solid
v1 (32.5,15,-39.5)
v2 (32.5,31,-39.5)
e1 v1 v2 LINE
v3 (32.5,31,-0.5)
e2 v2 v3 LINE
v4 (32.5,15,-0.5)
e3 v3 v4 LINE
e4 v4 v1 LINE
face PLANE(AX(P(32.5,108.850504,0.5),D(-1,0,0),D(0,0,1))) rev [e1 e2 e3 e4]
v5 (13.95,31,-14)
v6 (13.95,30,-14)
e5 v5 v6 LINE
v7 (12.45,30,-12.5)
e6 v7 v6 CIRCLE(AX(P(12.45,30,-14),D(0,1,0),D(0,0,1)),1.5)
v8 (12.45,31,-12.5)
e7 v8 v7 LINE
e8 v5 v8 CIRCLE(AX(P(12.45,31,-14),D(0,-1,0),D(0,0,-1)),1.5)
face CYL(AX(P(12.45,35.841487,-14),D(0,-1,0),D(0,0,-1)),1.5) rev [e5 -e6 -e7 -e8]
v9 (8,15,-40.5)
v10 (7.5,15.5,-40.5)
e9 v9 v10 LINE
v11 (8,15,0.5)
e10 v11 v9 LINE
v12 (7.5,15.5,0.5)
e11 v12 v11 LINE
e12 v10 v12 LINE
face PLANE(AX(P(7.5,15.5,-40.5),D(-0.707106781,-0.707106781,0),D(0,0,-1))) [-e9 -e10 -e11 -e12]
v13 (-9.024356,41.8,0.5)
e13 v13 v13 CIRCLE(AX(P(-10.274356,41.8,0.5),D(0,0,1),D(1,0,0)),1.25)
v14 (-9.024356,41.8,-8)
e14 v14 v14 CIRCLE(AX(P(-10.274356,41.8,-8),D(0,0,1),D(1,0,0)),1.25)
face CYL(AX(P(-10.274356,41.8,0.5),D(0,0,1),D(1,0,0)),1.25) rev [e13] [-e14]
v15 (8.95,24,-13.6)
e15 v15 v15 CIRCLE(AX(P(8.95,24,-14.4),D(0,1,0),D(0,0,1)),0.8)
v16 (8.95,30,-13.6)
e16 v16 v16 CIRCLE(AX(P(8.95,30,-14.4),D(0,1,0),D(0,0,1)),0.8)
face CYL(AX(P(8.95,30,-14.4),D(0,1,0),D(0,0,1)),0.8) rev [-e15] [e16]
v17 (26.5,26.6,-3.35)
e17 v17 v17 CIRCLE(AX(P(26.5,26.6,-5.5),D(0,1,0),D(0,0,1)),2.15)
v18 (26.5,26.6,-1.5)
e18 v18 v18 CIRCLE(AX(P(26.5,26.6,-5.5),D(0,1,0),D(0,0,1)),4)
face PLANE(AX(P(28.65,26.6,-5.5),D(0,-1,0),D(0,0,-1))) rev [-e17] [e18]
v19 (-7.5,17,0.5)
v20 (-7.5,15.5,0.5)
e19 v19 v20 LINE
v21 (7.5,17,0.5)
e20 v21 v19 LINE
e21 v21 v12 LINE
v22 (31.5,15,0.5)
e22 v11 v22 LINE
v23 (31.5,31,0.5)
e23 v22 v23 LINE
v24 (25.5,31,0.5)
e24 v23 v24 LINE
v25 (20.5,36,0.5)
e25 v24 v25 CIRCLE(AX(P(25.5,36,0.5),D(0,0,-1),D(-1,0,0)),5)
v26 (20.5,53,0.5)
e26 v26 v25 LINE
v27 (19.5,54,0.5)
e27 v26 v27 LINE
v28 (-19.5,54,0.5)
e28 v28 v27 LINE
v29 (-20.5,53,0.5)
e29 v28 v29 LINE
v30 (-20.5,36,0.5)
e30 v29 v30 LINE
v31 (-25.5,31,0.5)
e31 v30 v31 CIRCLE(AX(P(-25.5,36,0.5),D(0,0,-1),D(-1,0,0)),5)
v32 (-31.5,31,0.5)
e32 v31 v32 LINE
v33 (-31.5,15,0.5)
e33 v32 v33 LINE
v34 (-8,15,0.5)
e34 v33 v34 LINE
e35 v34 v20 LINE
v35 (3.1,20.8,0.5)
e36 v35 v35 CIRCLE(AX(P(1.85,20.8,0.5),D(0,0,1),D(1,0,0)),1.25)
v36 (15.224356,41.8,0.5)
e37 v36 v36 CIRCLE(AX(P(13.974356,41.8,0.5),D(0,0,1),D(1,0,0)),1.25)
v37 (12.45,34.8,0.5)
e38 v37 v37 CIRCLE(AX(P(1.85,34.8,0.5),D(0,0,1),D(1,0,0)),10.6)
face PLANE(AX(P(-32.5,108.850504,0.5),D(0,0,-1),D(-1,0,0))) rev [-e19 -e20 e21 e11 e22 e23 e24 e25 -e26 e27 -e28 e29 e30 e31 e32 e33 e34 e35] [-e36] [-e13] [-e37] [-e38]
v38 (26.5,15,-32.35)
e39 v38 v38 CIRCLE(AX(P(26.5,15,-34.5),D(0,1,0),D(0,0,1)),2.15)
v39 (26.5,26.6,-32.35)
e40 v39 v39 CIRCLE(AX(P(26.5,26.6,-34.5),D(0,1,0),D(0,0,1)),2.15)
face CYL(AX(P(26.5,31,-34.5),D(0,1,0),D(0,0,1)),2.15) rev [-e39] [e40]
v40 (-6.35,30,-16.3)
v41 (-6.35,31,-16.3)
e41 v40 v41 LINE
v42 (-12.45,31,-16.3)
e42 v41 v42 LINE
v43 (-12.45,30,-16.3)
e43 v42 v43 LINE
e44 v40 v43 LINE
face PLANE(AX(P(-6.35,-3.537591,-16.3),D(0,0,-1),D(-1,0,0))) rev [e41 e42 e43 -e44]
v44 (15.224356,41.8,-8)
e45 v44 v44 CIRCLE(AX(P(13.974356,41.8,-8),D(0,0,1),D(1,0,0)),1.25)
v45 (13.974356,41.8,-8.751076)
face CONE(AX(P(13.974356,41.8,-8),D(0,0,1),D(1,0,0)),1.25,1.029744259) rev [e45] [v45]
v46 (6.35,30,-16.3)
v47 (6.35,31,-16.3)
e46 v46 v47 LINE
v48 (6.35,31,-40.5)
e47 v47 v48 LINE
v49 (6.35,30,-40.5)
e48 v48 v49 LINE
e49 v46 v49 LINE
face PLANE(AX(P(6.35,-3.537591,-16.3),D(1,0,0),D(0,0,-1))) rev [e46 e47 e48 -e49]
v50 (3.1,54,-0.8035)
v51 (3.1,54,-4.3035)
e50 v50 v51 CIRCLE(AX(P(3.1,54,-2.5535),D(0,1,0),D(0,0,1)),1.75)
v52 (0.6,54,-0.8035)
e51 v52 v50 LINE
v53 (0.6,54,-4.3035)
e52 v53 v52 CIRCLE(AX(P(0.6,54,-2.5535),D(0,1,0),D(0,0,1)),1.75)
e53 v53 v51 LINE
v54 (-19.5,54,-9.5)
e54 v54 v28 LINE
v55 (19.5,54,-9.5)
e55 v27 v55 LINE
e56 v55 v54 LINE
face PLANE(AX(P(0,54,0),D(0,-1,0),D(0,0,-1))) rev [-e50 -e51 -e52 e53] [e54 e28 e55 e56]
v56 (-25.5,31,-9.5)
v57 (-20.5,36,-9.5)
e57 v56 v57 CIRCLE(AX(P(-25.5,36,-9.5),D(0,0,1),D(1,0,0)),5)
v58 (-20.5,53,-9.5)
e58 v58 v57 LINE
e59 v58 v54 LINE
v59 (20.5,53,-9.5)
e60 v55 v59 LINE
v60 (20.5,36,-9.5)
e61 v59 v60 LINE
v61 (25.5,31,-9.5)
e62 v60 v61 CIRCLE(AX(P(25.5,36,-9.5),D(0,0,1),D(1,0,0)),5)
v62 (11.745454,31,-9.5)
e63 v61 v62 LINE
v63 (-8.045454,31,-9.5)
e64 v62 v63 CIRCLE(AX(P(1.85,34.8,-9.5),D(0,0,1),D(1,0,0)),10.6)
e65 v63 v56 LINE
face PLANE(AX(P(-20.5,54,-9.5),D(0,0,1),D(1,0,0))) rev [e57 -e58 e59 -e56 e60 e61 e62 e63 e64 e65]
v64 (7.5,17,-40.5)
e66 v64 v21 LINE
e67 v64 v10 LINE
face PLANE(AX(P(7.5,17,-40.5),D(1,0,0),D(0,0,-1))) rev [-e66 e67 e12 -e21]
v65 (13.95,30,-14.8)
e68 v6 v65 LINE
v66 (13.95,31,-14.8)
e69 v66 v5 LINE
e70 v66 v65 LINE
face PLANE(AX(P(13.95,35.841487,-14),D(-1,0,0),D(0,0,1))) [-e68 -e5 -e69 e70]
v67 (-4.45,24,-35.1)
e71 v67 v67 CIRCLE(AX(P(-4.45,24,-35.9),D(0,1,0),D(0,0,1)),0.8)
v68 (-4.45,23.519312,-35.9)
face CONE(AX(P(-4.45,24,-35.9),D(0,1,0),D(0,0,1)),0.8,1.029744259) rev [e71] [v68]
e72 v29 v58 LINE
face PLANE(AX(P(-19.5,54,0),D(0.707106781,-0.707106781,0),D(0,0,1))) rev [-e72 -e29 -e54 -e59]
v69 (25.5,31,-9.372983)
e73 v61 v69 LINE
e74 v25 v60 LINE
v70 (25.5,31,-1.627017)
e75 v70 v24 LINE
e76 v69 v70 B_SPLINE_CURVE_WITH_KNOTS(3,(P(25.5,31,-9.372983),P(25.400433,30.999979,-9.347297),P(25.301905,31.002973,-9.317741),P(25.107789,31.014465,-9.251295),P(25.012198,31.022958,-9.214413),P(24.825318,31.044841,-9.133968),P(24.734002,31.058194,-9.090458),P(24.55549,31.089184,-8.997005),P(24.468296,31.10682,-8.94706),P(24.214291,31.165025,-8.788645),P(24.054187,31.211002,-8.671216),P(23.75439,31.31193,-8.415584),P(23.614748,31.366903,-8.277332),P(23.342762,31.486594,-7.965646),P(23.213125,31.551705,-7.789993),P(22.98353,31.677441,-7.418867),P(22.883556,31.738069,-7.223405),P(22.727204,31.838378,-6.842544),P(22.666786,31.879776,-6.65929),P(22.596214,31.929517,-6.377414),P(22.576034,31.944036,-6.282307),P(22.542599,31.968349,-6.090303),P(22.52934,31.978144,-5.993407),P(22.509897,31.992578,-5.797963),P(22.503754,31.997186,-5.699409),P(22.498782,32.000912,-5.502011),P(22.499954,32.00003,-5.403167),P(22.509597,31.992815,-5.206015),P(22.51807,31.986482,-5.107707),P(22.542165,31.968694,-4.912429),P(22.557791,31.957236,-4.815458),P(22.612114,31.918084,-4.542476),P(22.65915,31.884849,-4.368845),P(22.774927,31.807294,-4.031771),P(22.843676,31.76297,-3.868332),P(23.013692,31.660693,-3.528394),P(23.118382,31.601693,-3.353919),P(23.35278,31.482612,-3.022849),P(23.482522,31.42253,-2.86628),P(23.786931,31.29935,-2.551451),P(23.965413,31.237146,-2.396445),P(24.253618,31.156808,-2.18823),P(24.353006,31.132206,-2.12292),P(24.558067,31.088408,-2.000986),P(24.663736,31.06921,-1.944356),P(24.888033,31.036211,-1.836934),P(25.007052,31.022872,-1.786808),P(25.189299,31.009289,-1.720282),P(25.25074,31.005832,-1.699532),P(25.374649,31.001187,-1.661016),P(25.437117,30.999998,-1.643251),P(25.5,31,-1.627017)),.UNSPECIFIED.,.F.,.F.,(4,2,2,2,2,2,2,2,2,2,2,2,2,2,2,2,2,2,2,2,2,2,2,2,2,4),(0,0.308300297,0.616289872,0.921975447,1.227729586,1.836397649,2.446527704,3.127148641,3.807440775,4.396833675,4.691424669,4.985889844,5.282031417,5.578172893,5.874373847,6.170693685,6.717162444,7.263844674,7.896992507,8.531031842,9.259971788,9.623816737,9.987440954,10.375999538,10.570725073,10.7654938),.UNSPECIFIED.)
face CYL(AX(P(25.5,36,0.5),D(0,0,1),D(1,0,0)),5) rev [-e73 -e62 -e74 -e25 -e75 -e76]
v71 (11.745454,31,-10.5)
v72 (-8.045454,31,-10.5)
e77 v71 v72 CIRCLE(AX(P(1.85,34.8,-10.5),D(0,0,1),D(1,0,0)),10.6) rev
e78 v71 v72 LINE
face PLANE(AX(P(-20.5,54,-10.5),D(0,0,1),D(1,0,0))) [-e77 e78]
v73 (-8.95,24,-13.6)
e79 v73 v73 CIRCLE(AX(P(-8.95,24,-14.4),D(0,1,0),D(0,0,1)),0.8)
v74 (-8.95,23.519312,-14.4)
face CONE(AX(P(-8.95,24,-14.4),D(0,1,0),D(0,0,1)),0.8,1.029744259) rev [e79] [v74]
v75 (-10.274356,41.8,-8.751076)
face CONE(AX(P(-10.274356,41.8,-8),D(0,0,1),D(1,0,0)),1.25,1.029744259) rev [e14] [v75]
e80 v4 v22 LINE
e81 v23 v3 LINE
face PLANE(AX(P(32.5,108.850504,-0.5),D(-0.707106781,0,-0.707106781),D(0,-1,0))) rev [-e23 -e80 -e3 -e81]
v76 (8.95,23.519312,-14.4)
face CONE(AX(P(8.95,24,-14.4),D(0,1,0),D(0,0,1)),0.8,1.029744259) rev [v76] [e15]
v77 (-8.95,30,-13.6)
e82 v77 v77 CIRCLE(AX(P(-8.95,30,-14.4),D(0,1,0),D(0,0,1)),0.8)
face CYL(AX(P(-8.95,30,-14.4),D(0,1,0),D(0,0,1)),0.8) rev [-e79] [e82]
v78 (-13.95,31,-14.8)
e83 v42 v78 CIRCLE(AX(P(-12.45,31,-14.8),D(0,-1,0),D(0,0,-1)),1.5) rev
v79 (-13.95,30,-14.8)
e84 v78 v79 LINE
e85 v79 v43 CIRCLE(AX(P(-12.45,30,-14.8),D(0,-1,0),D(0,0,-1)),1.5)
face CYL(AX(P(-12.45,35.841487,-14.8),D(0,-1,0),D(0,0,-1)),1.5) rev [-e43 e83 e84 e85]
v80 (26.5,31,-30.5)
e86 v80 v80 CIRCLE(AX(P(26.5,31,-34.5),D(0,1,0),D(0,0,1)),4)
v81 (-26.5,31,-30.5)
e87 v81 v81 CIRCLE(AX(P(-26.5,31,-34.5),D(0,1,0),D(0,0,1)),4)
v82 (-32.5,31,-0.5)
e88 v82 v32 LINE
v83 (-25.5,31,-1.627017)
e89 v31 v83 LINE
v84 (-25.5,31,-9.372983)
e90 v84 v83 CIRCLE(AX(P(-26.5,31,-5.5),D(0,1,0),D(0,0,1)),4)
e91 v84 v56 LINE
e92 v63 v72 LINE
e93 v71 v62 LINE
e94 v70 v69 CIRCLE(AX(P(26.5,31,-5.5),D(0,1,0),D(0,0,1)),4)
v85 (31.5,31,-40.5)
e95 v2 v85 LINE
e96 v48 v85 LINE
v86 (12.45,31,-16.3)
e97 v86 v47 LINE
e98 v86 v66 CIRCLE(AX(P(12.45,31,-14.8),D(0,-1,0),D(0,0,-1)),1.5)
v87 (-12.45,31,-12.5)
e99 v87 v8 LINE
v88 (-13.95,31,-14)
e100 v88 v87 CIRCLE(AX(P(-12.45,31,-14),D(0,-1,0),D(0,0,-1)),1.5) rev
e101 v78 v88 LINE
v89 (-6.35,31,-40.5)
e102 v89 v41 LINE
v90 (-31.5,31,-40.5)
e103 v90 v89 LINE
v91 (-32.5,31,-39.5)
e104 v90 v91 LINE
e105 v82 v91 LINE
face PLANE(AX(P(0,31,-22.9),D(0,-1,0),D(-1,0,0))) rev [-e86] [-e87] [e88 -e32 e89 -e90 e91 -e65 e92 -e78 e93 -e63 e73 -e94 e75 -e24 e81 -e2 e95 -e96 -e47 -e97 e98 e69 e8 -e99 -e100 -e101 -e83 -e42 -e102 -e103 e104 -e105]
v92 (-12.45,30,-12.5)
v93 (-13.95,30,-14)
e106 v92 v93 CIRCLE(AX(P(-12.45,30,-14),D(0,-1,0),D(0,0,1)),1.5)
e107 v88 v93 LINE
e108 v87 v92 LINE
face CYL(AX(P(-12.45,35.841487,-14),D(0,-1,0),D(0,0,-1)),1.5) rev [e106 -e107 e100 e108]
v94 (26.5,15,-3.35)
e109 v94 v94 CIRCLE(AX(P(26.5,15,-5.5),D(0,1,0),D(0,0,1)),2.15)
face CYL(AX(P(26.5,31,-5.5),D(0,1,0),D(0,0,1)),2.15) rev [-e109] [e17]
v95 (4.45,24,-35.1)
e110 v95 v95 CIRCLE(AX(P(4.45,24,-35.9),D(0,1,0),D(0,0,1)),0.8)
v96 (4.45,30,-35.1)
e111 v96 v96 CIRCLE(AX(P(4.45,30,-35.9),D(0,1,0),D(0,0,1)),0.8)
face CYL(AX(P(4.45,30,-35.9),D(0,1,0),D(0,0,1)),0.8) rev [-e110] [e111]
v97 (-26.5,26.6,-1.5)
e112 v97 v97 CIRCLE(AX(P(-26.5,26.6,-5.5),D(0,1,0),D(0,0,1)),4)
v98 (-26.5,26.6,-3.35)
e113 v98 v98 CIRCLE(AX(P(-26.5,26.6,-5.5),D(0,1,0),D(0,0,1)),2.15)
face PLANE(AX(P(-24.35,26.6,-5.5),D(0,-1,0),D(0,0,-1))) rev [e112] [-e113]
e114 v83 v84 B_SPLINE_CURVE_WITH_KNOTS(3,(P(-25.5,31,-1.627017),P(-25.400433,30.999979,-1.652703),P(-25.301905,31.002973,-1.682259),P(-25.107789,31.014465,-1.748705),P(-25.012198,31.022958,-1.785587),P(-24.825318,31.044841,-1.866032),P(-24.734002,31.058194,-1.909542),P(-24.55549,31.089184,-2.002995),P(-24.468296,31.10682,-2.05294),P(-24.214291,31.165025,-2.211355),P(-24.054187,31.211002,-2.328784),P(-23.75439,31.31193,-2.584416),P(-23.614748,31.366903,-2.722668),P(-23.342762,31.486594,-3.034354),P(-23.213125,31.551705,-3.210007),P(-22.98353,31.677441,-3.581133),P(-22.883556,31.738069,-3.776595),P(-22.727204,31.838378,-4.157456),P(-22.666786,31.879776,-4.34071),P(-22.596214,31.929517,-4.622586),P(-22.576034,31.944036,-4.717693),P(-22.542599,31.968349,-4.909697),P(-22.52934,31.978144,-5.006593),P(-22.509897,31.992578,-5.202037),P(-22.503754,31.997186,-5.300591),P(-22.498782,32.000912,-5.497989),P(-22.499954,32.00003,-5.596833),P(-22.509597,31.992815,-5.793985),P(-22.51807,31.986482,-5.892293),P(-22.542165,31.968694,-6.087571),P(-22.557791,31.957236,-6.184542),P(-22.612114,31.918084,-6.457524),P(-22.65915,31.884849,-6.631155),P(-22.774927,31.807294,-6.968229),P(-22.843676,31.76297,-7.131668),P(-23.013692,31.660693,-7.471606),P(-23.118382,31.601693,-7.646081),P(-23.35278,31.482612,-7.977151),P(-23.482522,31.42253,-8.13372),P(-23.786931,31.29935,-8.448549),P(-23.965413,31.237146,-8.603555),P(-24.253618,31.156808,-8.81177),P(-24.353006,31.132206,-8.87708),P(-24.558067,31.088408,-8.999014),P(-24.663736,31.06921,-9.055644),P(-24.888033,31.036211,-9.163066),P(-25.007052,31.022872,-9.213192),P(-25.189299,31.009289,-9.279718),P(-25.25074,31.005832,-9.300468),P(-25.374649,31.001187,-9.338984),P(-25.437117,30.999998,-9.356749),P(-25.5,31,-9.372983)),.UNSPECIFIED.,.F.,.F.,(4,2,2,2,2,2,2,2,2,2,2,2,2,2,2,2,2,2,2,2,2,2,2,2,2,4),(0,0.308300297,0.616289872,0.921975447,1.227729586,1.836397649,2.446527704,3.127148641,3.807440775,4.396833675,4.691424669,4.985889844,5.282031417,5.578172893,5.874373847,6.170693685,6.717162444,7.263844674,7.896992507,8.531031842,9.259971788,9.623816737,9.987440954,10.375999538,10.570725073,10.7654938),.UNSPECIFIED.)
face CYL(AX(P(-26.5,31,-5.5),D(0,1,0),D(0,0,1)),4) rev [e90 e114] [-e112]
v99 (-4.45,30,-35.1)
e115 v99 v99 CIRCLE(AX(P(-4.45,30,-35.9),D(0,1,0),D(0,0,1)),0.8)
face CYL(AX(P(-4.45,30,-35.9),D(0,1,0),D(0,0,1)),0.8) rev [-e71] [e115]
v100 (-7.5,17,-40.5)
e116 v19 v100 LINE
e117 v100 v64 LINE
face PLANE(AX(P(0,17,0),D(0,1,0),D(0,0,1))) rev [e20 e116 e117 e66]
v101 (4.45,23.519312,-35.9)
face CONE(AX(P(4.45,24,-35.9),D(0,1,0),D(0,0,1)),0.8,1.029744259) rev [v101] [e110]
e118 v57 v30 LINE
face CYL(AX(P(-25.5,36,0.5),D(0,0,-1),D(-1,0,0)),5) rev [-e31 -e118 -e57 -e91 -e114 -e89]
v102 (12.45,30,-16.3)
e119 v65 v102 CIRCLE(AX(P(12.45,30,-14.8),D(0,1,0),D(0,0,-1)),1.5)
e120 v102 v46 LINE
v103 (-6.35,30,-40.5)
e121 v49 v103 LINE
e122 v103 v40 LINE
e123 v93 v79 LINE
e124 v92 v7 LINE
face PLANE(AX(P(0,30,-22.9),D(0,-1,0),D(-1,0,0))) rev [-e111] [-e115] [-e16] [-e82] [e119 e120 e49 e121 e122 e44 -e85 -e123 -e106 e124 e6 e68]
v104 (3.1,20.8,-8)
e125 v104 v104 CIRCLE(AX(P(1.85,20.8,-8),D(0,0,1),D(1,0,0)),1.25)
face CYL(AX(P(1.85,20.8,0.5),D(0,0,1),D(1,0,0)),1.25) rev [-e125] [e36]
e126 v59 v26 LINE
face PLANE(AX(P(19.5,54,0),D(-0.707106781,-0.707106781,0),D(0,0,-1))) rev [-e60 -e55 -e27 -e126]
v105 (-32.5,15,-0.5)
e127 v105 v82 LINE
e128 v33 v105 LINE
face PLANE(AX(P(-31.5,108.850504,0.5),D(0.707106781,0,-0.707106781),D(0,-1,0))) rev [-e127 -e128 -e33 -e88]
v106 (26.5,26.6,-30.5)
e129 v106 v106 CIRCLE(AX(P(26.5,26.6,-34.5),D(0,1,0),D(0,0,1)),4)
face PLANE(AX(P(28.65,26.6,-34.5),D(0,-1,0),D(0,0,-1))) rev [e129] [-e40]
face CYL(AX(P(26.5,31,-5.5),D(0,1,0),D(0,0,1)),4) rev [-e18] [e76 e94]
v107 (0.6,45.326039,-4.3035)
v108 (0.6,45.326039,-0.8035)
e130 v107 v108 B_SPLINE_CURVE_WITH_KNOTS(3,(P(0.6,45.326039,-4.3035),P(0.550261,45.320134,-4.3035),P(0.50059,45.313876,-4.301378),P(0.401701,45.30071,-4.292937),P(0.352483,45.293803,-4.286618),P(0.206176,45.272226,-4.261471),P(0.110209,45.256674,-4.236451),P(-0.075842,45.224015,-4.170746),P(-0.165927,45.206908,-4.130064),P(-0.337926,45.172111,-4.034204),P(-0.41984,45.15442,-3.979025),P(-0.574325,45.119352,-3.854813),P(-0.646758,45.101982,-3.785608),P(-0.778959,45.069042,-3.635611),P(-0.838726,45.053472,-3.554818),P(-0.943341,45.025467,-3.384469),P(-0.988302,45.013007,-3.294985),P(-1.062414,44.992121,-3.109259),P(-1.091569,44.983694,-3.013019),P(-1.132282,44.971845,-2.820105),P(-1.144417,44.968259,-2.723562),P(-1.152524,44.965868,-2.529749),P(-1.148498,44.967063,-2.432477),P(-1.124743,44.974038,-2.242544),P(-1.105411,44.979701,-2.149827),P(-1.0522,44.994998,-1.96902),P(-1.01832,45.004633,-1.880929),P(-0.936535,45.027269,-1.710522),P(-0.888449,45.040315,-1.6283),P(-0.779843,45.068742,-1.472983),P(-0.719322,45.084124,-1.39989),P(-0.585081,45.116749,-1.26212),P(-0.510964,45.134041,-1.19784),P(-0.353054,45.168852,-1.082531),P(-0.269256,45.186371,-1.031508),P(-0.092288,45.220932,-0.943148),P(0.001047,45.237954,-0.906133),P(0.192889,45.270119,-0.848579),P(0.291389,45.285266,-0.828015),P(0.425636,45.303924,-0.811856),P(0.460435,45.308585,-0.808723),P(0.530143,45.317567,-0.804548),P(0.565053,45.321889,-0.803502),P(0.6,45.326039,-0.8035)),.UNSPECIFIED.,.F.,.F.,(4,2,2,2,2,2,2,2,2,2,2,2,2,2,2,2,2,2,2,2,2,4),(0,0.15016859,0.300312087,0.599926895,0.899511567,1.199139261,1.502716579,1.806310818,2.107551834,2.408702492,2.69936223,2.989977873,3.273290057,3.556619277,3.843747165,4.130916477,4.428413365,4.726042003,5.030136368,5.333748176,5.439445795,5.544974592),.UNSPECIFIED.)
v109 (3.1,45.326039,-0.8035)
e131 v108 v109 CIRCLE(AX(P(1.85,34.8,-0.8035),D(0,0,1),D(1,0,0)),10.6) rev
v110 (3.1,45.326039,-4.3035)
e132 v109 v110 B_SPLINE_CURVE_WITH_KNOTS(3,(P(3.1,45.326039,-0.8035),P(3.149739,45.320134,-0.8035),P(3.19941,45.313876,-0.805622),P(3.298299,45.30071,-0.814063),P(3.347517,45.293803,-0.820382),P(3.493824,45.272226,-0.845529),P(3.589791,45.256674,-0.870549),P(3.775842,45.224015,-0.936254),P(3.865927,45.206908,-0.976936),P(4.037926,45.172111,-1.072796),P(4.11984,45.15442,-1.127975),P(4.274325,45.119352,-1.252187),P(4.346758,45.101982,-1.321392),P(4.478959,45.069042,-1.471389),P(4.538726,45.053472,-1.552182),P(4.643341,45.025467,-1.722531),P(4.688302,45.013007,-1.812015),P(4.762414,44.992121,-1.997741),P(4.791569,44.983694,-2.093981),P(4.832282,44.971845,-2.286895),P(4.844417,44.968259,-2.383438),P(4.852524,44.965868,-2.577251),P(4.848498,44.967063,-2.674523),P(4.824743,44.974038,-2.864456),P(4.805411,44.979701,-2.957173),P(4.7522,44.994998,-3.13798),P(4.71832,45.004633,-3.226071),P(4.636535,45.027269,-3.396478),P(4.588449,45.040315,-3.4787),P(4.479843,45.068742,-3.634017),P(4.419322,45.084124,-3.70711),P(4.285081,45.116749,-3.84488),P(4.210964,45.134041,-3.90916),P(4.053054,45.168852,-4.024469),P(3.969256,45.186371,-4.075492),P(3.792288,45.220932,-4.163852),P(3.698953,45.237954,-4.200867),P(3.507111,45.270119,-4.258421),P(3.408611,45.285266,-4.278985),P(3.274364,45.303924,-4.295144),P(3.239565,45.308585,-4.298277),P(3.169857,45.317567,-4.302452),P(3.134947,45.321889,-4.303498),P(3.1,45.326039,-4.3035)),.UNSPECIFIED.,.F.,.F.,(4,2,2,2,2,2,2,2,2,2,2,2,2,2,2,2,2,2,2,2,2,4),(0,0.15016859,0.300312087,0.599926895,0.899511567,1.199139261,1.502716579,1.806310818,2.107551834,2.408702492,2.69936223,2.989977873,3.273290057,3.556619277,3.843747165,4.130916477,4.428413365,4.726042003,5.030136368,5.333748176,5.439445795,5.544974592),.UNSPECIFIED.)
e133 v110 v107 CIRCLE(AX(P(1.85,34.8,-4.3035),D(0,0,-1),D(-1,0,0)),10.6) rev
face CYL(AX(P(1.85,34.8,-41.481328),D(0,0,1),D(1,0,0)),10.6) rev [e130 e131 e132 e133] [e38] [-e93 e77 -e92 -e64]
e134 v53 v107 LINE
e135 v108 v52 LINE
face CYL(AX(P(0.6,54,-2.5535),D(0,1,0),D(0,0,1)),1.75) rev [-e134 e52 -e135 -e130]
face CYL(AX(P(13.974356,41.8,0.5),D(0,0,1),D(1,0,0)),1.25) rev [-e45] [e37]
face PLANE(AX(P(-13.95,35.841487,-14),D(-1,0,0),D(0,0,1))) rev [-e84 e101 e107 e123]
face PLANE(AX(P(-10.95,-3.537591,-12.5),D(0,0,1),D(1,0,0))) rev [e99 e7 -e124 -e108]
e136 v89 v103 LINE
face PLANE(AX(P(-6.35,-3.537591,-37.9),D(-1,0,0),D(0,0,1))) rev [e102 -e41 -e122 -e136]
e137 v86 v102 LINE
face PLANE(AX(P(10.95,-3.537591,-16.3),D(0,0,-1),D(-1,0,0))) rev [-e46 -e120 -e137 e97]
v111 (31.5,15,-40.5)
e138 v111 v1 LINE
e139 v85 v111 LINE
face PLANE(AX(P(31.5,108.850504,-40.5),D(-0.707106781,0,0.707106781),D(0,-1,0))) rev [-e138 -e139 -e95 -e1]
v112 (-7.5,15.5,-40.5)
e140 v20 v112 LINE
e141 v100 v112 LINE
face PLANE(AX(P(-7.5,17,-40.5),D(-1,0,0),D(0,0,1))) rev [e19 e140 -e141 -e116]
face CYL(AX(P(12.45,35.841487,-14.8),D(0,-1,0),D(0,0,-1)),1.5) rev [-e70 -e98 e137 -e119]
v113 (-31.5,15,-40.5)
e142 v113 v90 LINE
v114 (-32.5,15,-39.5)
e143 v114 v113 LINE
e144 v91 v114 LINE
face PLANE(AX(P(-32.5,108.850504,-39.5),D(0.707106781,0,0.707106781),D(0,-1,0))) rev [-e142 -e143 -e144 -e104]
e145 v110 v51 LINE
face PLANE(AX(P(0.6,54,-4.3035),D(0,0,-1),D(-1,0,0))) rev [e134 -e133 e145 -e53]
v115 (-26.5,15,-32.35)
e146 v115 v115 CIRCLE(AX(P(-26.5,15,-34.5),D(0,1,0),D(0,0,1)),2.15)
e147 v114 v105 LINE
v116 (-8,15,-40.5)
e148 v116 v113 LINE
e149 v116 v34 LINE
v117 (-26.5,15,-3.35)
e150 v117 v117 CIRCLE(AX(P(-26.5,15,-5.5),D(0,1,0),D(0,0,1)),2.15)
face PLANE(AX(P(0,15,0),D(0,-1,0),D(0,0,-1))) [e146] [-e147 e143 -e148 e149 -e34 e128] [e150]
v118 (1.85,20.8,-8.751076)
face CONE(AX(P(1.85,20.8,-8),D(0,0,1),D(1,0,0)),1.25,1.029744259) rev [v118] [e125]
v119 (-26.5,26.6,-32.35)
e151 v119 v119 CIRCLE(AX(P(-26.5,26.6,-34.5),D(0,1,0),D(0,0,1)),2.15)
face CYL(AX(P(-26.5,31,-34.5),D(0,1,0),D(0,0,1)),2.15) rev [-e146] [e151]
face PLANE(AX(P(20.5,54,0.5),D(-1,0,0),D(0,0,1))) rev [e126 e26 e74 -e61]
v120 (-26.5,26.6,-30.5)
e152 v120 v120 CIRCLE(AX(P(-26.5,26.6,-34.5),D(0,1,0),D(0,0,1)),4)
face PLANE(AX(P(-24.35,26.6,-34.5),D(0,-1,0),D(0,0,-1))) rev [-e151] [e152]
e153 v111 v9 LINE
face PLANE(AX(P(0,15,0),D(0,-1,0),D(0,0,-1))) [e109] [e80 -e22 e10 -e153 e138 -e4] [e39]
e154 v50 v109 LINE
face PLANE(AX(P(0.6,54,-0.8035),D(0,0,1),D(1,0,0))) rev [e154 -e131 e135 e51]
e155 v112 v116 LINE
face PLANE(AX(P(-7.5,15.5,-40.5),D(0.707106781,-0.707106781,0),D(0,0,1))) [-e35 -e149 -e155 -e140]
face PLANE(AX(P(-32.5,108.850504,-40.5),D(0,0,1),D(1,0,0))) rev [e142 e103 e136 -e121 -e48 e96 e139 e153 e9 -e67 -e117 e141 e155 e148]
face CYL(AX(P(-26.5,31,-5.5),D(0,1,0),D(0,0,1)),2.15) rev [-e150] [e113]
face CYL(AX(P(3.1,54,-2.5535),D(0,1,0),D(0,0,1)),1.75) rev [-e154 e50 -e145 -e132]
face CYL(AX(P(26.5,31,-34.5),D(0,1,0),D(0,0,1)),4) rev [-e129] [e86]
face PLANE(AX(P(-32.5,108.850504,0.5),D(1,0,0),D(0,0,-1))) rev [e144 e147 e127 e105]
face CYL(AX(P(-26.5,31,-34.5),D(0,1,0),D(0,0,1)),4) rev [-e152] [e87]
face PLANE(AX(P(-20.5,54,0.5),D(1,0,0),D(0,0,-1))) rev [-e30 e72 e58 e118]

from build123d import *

# Parameters (mm, degrees)
SKETCH1_W                                           = 65
SKETCH1_H                                           = 41
BOSS_EXTRUDE1_DEPTH                                 = 16
SKETCH15_W                                          = 41
SKETCH15_H                                          = 10
BOSS_EXTRUDE4_DEPTH                                 = 23
SKETCH4_R                                           = 10.6
CUT_EXTRUDE3_DEPTH                                  = 11
M3_TAPPED_HOLE1_D                                   = 2.5
M3_TAPPED_HOLE1_DEPTH                               = 8.5
M3_TAPPED_HOLE1_TIP                                 = 0.751075774
CUT_EXTRUDE4_START                                  = -1
CUT_EXTRUDE4_DEPTH                                  = 1
SKETCH34_W                                          = 12.7
SKETCH34_H                                          = 2.6
CUT_EXTRUDE9_DEPTH                                  = 58.20576894
CUT_EXTRUDE7_DEPTH                                  = 1
M2_TAPPED_HOLE1_D                                   = 1.6
M2_TAPPED_HOLE1_DEPTH                               = 6
M2_TAPPED_HOLE1_TIP                                 = 0.480688495
CBORE_FOR_M4_HEX_SOCKET_HEAD_CAP_SCREW1_D           = 4.3
CBORE_FOR_M4_HEX_SOCKET_HEAD_CAP_SCREW1_CBORE_D     = 8
CBORE_FOR_M4_HEX_SOCKET_HEAD_CAP_SCREW1_CBORE_DEPTH = 4.4
FILLET1_R                                           = 5
CHAMFER4_SIZE                                       = 1
F_3_5_START                                         = 44
F_3_5_3_5_DIAMETER_SLOT1_DEPTH                      = 10
SKETCH33_W                                          = 15
SKETCH33_H                                          = 41
CUT_EXTRUDE8_DEPTH                                  = 2
CHAMFER5_SIZE                                       = 0.5


with BuildPart() as part:
    # Sketch1 → Boss-Extrude1 (new body)
    with BuildSketch(Plane(origin=(0, 15, 0), x_dir=(1, 0, 0), z_dir=(0, 1, 0))):
        with Locations((0, 20)):
            Rectangle(SKETCH1_W, SKETCH1_H)
    extrude(amount=BOSS_EXTRUDE1_DEPTH)

    # Sketch15 → Boss-Extrude4 (add)
    with BuildSketch(Plane(origin=(0, 31, 0), x_dir=(1, 0, 0), z_dir=(0, 1, 0))):
        with Locations((0, 4.5)):
            Rectangle(SKETCH15_W, SKETCH15_H)
    extrude(amount=BOSS_EXTRUDE4_DEPTH)

    # Sketch4 → Cut-Extrude3 (cut)
    with BuildSketch(Plane.XY.offset(0.5)):
        with Locations((1.85, 34.8)):
            Circle(SKETCH4_R)
    extrude(amount=-CUT_EXTRUDE3_DEPTH, mode=Mode.SUBTRACT)

    # M3 Tapped Hole1
    with Locations(Plane.XY.offset(0.5)):
        with Locations((13.974355653, 41.8), (1.85, 20.8), (-10.274355653, 41.8)):
            Hole(M3_TAPPED_HOLE1_D / 2, depth=M3_TAPPED_HOLE1_DEPTH)
            with Locations((0, 0, -(M3_TAPPED_HOLE1_DEPTH + M3_TAPPED_HOLE1_TIP / 2))):  # 118° drill point
                Cone(0, M3_TAPPED_HOLE1_D / 2, M3_TAPPED_HOLE1_TIP, mode=Mode.SUBTRACT)

    # Sketch16 → Cut-Extrude4 (cut)
    with BuildSketch(Plane(origin=(0, 31, 0), x_dir=(1, 0, 0), z_dir=(0, 1, 0)).offset(CUT_EXTRUDE4_START)):
        Polygon((-10.95, 12.5), (10.95, 12.5), (10.95, 16.3), (6.35, 16.3), (6.35, 37.9), (-6.35, 37.9), (-6.35, 16.3), (-10.95, 16.3), align=None)
    extrude(amount=CUT_EXTRUDE4_DEPTH, mode=Mode.SUBTRACT)

    # Sketch34 → Cut-Extrude9 (cut, through all)
    with BuildSketch(Plane(origin=(0, 30, 0), x_dir=(1, 0, 0), z_dir=(0, 1, 0))):
        with Locations((0, 39.2)):
            Rectangle(SKETCH34_W, SKETCH34_H)
    extrude(amount=CUT_EXTRUDE9_DEPTH, mode=Mode.SUBTRACT)

    # Sketch28 → Cut-Extrude7 (cut)
    with BuildSketch(Plane(origin=(0, 30, 0), x_dir=(1, 0, 0), z_dir=(0, 1, 0))):
        with BuildLine():
            Line((10.95, 12.5), (12.45, 12.5))
            ThreePointArc((12.45, 12.5), (13.510660172, 12.939339828), (13.95, 14))
            Line((13.95, 14), (13.95, 14.8))
            ThreePointArc((13.95, 14.8), (13.510660172, 15.860660172), (12.45, 16.3))
            Line((12.45, 16.3), (10.95, 16.3))
            Line((10.95, 16.3), (10.95, 12.5))
        make_face()
    cut_extrude7 = extrude(amount=CUT_EXTRUDE7_DEPTH, mode=Mode.SUBTRACT)

    # Mirror1: Cut-Extrude7 across plane
    add(cut_extrude7.mirror(Plane(origin=(0, 0, 0), x_dir=(0, 0, 1), z_dir=(1, 0, 0))), mode=Mode.SUBTRACT)

    # M2 Tapped Hole1
    with Locations(Plane(origin=(0, 30, 0), x_dir=(1, 0, 0), z_dir=(0, 1, 0))):
        with Locations((-4.45, 35.9), (4.45, 35.9), (8.95, 14.4), (-8.95, 14.4)):
            Hole(M2_TAPPED_HOLE1_D / 2, depth=M2_TAPPED_HOLE1_DEPTH)
            with Locations((0, 0, -(M2_TAPPED_HOLE1_DEPTH + M2_TAPPED_HOLE1_TIP / 2))):  # 118° drill point
                Cone(0, M2_TAPPED_HOLE1_D / 2, M2_TAPPED_HOLE1_TIP, mode=Mode.SUBTRACT)

    # CBORE for M4 Hex Socket Head Cap Screw1 (through all)
    with Locations(Plane(origin=(0, 31, 0), x_dir=(1, 0, 0), z_dir=(0, 1, 0))):
        with Locations((26.5, 34.5), (-26.5, 34.5), (-26.5, 5.5), (26.5, 5.5)):
            CounterBoreHole(CBORE_FOR_M4_HEX_SOCKET_HEAD_CAP_SCREW1_D / 2, CBORE_FOR_M4_HEX_SOCKET_HEAD_CAP_SCREW1_CBORE_D / 2, CBORE_FOR_M4_HEX_SOCKET_HEAD_CAP_SCREW1_CBORE_DEPTH)

    # Fillet1
    # the kernel refuses this fillet: 5 mm, written as the material it adds along each edge
    with BuildSketch(Plane(origin=(20.5, 31, 0.5), x_dir=(1, 0, 0), z_dir=(0, 0, -1))) as fillet1_piece_1_section:
        with BuildLine():
            CenterArc((FILLET1_R, -FILLET1_R), FILLET1_R, 90, 90)
            Line((0, -FILLET1_R), (0, 0))
            Line((0, 0), (FILLET1_R, 0))
        make_face()
    fillet1_piece_1 = extrude(amount=10, mode=Mode.PRIVATE)
    fillet1_piece_1 = fillet1_piece_1 - Plane(origin=(26.5, 31, -5.5), x_dir=(1, 0, 0), z_dir=(0, 1, 0)) * Cylinder(4, 41, mode=Mode.PRIVATE)
    add(fillet1_piece_1)
    with BuildSketch(Plane(origin=(-20.5, 31, -9.5), x_dir=(-1, 0, 0), z_dir=(0, 0, 1))) as fillet1_piece_2_section:
        with BuildLine():
            CenterArc((FILLET1_R, -FILLET1_R), FILLET1_R, 90, 90)
            Line((0, -FILLET1_R), (0, 0))
            Line((0, 0), (FILLET1_R, 0))
        make_face()
    fillet1_piece_2 = extrude(amount=10, mode=Mode.PRIVATE)
    fillet1_piece_2 = fillet1_piece_2 - Plane(origin=(-26.5, 31, -5.5), x_dir=(1, 0, 0), z_dir=(0, 1, 0)) * Cylinder(4, 41, mode=Mode.PRIVATE)
    add(fillet1_piece_2)

    # Chamfer4
    chamfer4_edges = [part.edges().sort_by_distance(p)[0] for p in [
        (-20.5, 54, -4.5),
        (20.5, 54, -4.5),
        (32.5, 23, 0.5),
        (-32.5, 23, 0.5),
        (32.5, 23, -40.5),
        (-32.5, 23, -40.5),
    ]]
    chamfer(chamfer4_edges, length=CHAMFER4_SIZE)

    # Ø3.5 (3.5) Diameter Slot1: read off the stored shape, not the designer's step
    # Ø3.5 (3.5) Diameter Slot1 outline → Ø3.5 (3.5) Diameter Slot1 (cut)
    with BuildSketch(Plane(origin=(0, 0, 0), x_dir=(1, 0, 0), z_dir=(0, 1, 0)).offset(F_3_5_START)):
        with BuildLine():
            Line((0.6, 0.8035), (3.1, 0.8035))
            ThreePointArc((3.1, 0.8035), (4.85, 2.5535), (3.1, 4.3035))
            Line((3.1, 4.3035), (0.6, 4.3035))
            ThreePointArc((0.6, 4.3035), (-1.15, 2.5535), (0.6, 0.8035))
        make_face()
    extrude(amount=F_3_5_3_5_DIAMETER_SLOT1_DEPTH, mode=Mode.SUBTRACT)

    # Sketch33 → Cut-Extrude8 (cut)
    with BuildSketch(Plane.XZ.offset(-15)):
        with Locations((0, -20)):
            Rectangle(SKETCH33_W, SKETCH33_H)
    extrude(amount=-CUT_EXTRUDE8_DEPTH, mode=Mode.SUBTRACT)

    # Chamfer5
    chamfer5_edges = [part.edges().sort_by_distance(p)[0] for p in [
        (7.5, 15, -20),
        (-7.5, 15, -20),
    ]]
    chamfer(chamfer5_edges, length=CHAMFER5_SIZE)


solid = part.part
